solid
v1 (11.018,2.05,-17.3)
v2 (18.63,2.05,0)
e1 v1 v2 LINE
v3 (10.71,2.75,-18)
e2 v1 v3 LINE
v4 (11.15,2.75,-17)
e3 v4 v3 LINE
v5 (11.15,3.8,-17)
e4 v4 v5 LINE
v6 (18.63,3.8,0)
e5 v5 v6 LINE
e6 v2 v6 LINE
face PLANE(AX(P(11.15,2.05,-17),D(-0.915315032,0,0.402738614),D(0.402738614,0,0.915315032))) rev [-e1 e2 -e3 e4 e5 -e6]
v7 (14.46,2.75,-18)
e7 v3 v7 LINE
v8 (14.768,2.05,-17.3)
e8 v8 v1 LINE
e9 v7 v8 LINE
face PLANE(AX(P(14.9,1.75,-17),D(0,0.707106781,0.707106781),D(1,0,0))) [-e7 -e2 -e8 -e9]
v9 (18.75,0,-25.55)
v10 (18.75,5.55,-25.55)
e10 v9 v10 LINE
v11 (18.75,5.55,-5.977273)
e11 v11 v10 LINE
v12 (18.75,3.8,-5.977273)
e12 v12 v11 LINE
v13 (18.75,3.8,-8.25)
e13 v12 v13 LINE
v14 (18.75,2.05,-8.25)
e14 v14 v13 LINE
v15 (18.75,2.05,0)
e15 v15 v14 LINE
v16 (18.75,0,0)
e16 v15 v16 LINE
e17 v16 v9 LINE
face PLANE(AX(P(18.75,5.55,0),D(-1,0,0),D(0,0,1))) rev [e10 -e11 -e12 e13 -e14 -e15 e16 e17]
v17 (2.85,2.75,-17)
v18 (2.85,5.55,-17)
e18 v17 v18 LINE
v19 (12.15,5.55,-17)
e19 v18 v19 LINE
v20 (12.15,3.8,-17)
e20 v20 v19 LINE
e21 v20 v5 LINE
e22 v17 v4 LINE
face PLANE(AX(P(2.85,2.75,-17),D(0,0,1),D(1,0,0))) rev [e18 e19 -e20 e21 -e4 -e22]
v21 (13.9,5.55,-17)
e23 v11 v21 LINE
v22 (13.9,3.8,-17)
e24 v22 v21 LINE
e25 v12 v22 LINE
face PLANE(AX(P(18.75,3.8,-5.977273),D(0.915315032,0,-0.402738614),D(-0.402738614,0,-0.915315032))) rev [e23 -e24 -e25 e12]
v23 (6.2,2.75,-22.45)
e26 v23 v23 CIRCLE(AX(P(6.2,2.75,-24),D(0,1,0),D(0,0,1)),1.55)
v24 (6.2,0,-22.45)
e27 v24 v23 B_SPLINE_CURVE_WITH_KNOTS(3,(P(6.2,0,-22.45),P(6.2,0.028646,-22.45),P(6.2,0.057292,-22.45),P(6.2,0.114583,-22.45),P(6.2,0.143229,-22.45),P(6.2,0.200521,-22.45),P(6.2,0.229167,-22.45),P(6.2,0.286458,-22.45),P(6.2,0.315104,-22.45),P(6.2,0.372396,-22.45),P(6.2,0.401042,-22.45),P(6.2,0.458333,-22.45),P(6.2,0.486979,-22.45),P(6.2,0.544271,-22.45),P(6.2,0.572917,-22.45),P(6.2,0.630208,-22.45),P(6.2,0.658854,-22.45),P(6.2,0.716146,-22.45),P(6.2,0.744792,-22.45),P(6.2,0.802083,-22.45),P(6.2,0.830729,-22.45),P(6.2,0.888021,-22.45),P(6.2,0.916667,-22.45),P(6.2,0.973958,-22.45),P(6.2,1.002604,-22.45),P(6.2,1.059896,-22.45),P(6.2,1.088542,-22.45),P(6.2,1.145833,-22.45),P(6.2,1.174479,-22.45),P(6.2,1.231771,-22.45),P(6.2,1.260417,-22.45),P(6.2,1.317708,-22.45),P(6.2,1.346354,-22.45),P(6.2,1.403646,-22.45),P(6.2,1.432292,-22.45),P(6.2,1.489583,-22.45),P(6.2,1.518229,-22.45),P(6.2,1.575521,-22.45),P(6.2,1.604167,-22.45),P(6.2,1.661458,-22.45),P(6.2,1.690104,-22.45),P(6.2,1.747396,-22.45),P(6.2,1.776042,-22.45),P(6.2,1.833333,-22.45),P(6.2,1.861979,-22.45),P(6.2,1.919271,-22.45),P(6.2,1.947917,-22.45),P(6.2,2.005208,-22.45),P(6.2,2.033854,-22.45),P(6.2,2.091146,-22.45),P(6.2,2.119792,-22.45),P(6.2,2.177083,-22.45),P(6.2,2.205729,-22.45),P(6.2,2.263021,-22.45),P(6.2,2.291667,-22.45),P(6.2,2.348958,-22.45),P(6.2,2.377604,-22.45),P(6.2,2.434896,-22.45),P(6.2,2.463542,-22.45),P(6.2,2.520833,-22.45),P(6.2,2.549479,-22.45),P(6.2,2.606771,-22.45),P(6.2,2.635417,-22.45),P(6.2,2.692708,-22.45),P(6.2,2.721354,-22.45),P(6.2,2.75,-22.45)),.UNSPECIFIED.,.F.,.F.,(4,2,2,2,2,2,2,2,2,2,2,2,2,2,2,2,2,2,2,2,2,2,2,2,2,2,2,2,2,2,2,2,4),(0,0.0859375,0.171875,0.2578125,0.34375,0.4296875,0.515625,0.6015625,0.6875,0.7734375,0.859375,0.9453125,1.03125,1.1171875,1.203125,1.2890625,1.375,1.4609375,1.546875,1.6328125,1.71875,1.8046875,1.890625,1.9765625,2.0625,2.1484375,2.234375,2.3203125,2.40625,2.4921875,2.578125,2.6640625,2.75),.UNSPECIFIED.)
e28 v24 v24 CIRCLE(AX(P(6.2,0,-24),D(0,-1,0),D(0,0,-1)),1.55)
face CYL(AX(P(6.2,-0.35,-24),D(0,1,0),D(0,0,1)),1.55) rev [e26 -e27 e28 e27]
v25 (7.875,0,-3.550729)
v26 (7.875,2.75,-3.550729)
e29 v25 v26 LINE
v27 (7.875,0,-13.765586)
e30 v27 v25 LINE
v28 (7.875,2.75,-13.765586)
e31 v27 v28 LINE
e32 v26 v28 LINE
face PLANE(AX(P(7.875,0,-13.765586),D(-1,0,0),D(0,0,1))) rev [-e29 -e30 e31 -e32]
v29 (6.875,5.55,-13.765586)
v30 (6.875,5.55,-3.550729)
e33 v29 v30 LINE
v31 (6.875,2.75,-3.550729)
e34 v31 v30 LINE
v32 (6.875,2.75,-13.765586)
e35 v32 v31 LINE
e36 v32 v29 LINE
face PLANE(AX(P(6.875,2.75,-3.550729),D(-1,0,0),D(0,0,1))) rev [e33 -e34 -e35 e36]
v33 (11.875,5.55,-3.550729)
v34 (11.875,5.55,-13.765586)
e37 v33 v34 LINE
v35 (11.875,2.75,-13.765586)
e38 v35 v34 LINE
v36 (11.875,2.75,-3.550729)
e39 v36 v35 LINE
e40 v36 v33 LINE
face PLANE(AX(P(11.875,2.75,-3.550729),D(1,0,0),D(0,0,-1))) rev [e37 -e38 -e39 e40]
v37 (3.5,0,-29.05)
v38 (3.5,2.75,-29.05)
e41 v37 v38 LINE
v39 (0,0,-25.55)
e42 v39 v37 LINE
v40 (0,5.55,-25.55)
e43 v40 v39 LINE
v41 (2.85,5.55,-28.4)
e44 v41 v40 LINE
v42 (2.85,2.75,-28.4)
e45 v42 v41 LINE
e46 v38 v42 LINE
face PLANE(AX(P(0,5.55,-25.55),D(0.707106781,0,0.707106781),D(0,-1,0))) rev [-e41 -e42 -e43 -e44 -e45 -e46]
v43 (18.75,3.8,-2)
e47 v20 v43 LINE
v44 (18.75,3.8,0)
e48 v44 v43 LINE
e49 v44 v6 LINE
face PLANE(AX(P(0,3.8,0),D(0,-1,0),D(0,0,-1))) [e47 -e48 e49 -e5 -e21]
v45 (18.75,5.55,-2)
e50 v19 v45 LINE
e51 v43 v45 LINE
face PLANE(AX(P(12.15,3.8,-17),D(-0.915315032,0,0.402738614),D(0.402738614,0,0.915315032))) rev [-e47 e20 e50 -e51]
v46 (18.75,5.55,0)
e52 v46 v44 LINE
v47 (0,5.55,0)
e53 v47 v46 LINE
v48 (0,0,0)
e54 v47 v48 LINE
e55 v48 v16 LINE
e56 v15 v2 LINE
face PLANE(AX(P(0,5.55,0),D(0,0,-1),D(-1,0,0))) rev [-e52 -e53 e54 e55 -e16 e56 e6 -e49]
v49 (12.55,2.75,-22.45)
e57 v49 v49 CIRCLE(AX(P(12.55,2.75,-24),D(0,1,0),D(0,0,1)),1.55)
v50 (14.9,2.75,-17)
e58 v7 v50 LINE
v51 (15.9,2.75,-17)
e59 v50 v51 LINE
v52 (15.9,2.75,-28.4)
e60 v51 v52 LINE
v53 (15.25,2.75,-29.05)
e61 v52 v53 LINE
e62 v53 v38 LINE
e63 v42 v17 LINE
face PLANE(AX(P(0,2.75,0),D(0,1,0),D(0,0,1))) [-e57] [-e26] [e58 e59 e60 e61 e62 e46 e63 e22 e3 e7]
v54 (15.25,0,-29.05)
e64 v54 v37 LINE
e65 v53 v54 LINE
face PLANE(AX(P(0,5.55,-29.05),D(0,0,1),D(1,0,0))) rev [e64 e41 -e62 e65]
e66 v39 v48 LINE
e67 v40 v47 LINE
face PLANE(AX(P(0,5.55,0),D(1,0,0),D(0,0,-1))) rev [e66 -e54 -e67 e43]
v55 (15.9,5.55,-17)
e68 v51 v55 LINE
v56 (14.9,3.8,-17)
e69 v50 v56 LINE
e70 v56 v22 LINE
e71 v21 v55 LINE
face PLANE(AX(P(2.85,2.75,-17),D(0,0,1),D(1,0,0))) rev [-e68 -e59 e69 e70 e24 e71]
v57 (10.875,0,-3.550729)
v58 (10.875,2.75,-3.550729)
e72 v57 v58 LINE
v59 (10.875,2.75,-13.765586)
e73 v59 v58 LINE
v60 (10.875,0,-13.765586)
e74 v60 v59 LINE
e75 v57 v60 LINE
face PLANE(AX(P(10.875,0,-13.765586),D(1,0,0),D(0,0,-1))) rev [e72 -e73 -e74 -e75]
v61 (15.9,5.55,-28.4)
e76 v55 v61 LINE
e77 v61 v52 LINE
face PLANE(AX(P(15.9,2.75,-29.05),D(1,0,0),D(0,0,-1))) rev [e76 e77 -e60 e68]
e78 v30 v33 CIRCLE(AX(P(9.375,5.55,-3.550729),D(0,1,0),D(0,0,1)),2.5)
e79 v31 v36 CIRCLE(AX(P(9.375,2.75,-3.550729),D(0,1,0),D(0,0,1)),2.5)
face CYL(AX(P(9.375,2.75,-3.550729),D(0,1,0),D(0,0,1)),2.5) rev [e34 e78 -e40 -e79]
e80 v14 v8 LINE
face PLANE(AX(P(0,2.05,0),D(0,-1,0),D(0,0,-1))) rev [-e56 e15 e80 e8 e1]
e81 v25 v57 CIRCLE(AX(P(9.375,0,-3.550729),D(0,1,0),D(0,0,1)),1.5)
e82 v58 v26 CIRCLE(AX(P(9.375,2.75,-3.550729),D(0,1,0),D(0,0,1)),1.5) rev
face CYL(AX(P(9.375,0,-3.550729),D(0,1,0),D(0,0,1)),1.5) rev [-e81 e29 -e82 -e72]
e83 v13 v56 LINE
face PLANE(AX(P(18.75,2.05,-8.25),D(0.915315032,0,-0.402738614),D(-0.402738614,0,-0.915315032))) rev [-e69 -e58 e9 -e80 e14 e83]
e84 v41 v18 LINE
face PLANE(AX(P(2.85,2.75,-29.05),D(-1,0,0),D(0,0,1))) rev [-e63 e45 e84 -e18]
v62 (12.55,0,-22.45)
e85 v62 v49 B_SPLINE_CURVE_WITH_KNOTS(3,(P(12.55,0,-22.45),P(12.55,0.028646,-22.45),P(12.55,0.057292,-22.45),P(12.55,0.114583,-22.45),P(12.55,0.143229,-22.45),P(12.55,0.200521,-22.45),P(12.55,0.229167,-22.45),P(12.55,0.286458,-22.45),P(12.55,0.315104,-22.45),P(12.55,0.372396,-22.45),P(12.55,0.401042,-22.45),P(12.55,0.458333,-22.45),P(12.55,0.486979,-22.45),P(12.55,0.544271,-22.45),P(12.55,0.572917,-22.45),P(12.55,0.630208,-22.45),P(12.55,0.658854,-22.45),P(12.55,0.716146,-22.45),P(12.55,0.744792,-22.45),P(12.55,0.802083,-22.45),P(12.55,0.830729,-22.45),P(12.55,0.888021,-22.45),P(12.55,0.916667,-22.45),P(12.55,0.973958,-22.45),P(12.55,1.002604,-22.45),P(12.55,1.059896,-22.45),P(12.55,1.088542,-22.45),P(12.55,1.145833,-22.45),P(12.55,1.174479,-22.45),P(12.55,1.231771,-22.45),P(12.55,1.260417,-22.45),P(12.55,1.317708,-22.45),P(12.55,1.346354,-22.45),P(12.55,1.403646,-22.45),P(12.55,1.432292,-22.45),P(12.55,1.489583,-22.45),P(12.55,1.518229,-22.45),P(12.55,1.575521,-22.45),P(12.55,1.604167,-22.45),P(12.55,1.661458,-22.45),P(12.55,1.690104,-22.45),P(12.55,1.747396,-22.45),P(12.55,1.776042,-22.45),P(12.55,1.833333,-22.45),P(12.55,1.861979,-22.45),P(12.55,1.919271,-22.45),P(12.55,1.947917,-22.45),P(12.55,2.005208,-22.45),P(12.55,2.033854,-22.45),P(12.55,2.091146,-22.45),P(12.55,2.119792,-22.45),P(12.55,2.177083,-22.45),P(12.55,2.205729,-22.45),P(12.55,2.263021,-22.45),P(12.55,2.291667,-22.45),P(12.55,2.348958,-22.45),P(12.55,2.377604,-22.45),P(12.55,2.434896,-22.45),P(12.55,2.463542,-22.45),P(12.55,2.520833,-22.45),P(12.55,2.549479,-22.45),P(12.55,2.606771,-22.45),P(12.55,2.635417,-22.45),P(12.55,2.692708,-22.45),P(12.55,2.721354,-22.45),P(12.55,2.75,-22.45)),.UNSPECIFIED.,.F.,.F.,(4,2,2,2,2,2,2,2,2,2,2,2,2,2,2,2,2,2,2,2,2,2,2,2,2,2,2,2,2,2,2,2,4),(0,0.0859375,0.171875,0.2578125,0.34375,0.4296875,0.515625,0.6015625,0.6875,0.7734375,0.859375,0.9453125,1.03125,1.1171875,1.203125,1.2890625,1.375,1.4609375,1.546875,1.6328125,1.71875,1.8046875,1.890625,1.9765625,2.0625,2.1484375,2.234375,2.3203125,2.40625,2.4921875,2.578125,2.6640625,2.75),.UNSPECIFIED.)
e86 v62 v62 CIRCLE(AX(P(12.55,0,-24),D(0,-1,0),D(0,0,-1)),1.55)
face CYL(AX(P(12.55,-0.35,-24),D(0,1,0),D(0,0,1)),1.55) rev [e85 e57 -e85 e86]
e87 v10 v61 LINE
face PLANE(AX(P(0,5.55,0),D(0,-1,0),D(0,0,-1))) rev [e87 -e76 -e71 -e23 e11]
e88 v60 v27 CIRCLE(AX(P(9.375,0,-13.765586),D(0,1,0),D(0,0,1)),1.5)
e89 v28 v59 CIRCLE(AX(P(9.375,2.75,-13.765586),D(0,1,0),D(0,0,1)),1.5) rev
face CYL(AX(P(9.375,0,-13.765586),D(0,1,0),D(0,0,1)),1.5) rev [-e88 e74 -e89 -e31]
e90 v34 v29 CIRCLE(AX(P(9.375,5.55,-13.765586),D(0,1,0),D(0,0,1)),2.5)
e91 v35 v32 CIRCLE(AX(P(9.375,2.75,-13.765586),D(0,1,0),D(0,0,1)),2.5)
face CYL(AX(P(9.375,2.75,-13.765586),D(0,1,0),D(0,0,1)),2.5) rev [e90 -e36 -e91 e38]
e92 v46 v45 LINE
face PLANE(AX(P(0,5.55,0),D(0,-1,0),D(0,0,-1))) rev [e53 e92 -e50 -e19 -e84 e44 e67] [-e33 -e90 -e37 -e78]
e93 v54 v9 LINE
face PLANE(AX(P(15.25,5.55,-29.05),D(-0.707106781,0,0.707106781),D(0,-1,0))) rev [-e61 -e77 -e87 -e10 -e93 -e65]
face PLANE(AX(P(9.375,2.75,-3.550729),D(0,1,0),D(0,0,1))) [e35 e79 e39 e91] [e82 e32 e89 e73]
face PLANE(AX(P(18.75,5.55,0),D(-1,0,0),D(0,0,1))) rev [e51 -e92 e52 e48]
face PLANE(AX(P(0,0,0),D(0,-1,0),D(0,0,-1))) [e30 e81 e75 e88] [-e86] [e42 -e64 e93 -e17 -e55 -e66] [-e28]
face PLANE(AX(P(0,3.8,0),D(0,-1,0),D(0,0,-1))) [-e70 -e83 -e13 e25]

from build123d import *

# Parameters (mm, degrees)
SKETCH1_W                                  = 18.75
SKETCH1_H                                  = 29.05
BOSS_EXTRUDE1_DEPTH                        = 5.55
MICROSWITCHCUTSKETCH2_W                    = 13.05
MICROSWITCHCUTSKETCH2_H                    = 12.05
MICROSWITCHCUT_EXTRUDE1_DEPTH              = 2.8
MICROSWITCHMOUNTINGHOLESSKETCH3_R          = 1.55
MICROSWITCHMOUNTINGHOLESCUT_EXTRUDE2_DEPTH = 3.1
SLIDINGMOUNTHOLECUT_EXTRUDE3_DEPTH         = 36.018102461
CHAMFER1_SIZE                              = 3.5
SLIDINGMOUNTHOLEBORECUT_EXTRUDE4_DEPTH     = 2.8
THINCABLECUT_EXTRUDE5_DEPTH                = 1.75
THICKCABLECUT_EXTRUDE6_DEPTH               = 1.75
CHAMFER2_SIZE                              = 1


with BuildPart() as part:
    # Sketch1 → Boss-Extrude1 (new body)
    with BuildSketch(Plane(origin=(0, 0, 0), x_dir=(1, 0, 0), z_dir=(0, 1, 0))):
        with Locations((9.375, 14.525)):
            Rectangle(SKETCH1_W, SKETCH1_H)
    extrude(amount=BOSS_EXTRUDE1_DEPTH)

    # MicroSwitchCutSketch2 → MicroSwitchCut-Extrude1 (cut)
    with BuildSketch(Plane(origin=(0, 5.55, 0), x_dir=(1, 0, 0), z_dir=(0, 1, 0))):
        with Locations((9.375, 23.025)):
            Rectangle(MICROSWITCHCUTSKETCH2_W, MICROSWITCHCUTSKETCH2_H)
    extrude(amount=-MICROSWITCHCUT_EXTRUDE1_DEPTH, mode=Mode.SUBTRACT)

    # MicroSwitchMountingHolesSketch3 → MicroSwitchMountingHolesCut-Extrude2 (cut)
    with BuildSketch(Plane(origin=(0, 2.75, 0), x_dir=(1, 0, 0), z_dir=(0, 1, 0))):
        with Locations(Location((6.2, 24, 0), (0, 0, 270))):
            Circle(MICROSWITCHMOUNTINGHOLESSKETCH3_R)
        with Locations(Location((12.55, 24, 0), (0, 0, 270))):
            Circle(MICROSWITCHMOUNTINGHOLESSKETCH3_R)
    extrude(amount=-MICROSWITCHMOUNTINGHOLESCUT_EXTRUDE2_DEPTH, mode=Mode.SUBTRACT)

    # GantryMountSlotSketch4 → SlidingMountHoleCut-Extrude3 (cut, through all)
    with BuildSketch(Plane(origin=(0, 5.55, 0), x_dir=(1, 0, 0), z_dir=(0, 1, 0))):
        with BuildLine():
            Line((10.875, 13.765586377), (10.875, 3.550728623))
            ThreePointArc((10.875, 3.550728623), (9.375, 2.050728623), (7.875, 3.550728623))
            Line((7.875, 3.550728623), (7.875, 13.765586377))
            ThreePointArc((7.875, 13.765586377), (9.375, 15.265586377), (10.875, 13.765586377))
        make_face()
    extrude(amount=-SLIDINGMOUNTHOLECUT_EXTRUDE3_DEPTH, mode=Mode.SUBTRACT)

    # Chamfer1
    chamfer1_edges = [part.edges().sort_by_distance(p)[0] for p in [
        (18.75, 2.775, -29.05),
        (0, 2.775, -29.05),
    ]]
    chamfer(chamfer1_edges, length=CHAMFER1_SIZE)

    # Sketch2 → SlidingMountHoleBoreCut-Extrude4 (cut)
    with BuildSketch(Plane(origin=(0, 5.55, 0), x_dir=(1, 0, 0), z_dir=(0, 1, 0))):
        with BuildLine():
            Line((6.875, 3.550728623), (6.875, 13.765586377))
            ThreePointArc((6.875, 13.765586377), (9.375, 16.265586377), (11.875, 13.765586377))
            Line((11.875, 13.765586377), (11.875, 3.550728623))
            ThreePointArc((11.875, 3.550728623), (9.375, 1.050728623), (6.875, 3.550728623))
        make_face()
    extrude(amount=-SLIDINGMOUNTHOLEBORECUT_EXTRUDE4_DEPTH, mode=Mode.SUBTRACT)

    # Sketch3 → ThinCableCut-Extrude5 (cut)
    with BuildSketch(Plane(origin=(0, 5.55, 0), x_dir=(1, 0, 0), z_dir=(0, 1, 0))):
        Polygon((12.15, 17), (18.75, 2), (18.75, 5.977272727), (13.9, 17), align=None)
    extrude(amount=-THINCABLECUT_EXTRUDE5_DEPTH, mode=Mode.SUBTRACT)

    # Sketch4 → ThickCableCut-Extrude6 (cut)
    with BuildSketch(Plane(origin=(0, 3.8, 0), x_dir=(1, 0, 0), z_dir=(0, 1, 0))):
        Polygon((11.15, 17), (18.75, -0.272727273), (18.75, 8.25), (14.9, 17), align=None)
    extrude(amount=-THICKCABLECUT_EXTRUDE6_DEPTH, mode=Mode.SUBTRACT)

    # Chamfer2
    # the kernel refuses this chamfer: 1 mm, written as the material it takes off along each edge
    with BuildSketch(Plane(origin=(17.471682988, 2.75, -17), x_dir=(0, 0.02749587661058651, -0.9996219169112968), z_dir=(-1, 0, 0))) as chamfer2_piece_1_section:
        Polygon((CHAMFER2_SIZE * 0.999621916911, CHAMFER2_SIZE * 0.0274958766106), (-CHAMFER2_SIZE * 0.0274958766106, CHAMFER2_SIZE * 0.999621916911), (0, 0), align=None)
    chamfer2_piece_1 = extrude(amount=8.893365976, mode=Mode.PRIVATE)
    chamfer2_piece_1 = split(chamfer2_piece_1, bisect_by=Plane(origin=(12.868179487, 2.05, -17.356410256), z_dir=(0, 1, 0)), keep=Keep.TOP, mode=Mode.PRIVATE)
    chamfer2_piece_1 = split(chamfer2_piece_1, bisect_by=Plane(origin=(11.297301471, 2.462820513, -16.665223929), z_dir=(0.9153150324227658, 0, -0.40273861426601665)), keep=Keep.TOP, mode=Mode.PRIVATE)
    chamfer2_piece_1 = split(chamfer2_piece_1, bisect_by=Plane(origin=(14.439057503, 2.462820513, -18.047596583), z_dir=(-0.9153150324227658, 0, 0.40273861426601687)), keep=Keep.TOP, mode=Mode.PRIVATE)
    add(chamfer2_piece_1, mode=Mode.SUBTRACT)


solid = part.part
